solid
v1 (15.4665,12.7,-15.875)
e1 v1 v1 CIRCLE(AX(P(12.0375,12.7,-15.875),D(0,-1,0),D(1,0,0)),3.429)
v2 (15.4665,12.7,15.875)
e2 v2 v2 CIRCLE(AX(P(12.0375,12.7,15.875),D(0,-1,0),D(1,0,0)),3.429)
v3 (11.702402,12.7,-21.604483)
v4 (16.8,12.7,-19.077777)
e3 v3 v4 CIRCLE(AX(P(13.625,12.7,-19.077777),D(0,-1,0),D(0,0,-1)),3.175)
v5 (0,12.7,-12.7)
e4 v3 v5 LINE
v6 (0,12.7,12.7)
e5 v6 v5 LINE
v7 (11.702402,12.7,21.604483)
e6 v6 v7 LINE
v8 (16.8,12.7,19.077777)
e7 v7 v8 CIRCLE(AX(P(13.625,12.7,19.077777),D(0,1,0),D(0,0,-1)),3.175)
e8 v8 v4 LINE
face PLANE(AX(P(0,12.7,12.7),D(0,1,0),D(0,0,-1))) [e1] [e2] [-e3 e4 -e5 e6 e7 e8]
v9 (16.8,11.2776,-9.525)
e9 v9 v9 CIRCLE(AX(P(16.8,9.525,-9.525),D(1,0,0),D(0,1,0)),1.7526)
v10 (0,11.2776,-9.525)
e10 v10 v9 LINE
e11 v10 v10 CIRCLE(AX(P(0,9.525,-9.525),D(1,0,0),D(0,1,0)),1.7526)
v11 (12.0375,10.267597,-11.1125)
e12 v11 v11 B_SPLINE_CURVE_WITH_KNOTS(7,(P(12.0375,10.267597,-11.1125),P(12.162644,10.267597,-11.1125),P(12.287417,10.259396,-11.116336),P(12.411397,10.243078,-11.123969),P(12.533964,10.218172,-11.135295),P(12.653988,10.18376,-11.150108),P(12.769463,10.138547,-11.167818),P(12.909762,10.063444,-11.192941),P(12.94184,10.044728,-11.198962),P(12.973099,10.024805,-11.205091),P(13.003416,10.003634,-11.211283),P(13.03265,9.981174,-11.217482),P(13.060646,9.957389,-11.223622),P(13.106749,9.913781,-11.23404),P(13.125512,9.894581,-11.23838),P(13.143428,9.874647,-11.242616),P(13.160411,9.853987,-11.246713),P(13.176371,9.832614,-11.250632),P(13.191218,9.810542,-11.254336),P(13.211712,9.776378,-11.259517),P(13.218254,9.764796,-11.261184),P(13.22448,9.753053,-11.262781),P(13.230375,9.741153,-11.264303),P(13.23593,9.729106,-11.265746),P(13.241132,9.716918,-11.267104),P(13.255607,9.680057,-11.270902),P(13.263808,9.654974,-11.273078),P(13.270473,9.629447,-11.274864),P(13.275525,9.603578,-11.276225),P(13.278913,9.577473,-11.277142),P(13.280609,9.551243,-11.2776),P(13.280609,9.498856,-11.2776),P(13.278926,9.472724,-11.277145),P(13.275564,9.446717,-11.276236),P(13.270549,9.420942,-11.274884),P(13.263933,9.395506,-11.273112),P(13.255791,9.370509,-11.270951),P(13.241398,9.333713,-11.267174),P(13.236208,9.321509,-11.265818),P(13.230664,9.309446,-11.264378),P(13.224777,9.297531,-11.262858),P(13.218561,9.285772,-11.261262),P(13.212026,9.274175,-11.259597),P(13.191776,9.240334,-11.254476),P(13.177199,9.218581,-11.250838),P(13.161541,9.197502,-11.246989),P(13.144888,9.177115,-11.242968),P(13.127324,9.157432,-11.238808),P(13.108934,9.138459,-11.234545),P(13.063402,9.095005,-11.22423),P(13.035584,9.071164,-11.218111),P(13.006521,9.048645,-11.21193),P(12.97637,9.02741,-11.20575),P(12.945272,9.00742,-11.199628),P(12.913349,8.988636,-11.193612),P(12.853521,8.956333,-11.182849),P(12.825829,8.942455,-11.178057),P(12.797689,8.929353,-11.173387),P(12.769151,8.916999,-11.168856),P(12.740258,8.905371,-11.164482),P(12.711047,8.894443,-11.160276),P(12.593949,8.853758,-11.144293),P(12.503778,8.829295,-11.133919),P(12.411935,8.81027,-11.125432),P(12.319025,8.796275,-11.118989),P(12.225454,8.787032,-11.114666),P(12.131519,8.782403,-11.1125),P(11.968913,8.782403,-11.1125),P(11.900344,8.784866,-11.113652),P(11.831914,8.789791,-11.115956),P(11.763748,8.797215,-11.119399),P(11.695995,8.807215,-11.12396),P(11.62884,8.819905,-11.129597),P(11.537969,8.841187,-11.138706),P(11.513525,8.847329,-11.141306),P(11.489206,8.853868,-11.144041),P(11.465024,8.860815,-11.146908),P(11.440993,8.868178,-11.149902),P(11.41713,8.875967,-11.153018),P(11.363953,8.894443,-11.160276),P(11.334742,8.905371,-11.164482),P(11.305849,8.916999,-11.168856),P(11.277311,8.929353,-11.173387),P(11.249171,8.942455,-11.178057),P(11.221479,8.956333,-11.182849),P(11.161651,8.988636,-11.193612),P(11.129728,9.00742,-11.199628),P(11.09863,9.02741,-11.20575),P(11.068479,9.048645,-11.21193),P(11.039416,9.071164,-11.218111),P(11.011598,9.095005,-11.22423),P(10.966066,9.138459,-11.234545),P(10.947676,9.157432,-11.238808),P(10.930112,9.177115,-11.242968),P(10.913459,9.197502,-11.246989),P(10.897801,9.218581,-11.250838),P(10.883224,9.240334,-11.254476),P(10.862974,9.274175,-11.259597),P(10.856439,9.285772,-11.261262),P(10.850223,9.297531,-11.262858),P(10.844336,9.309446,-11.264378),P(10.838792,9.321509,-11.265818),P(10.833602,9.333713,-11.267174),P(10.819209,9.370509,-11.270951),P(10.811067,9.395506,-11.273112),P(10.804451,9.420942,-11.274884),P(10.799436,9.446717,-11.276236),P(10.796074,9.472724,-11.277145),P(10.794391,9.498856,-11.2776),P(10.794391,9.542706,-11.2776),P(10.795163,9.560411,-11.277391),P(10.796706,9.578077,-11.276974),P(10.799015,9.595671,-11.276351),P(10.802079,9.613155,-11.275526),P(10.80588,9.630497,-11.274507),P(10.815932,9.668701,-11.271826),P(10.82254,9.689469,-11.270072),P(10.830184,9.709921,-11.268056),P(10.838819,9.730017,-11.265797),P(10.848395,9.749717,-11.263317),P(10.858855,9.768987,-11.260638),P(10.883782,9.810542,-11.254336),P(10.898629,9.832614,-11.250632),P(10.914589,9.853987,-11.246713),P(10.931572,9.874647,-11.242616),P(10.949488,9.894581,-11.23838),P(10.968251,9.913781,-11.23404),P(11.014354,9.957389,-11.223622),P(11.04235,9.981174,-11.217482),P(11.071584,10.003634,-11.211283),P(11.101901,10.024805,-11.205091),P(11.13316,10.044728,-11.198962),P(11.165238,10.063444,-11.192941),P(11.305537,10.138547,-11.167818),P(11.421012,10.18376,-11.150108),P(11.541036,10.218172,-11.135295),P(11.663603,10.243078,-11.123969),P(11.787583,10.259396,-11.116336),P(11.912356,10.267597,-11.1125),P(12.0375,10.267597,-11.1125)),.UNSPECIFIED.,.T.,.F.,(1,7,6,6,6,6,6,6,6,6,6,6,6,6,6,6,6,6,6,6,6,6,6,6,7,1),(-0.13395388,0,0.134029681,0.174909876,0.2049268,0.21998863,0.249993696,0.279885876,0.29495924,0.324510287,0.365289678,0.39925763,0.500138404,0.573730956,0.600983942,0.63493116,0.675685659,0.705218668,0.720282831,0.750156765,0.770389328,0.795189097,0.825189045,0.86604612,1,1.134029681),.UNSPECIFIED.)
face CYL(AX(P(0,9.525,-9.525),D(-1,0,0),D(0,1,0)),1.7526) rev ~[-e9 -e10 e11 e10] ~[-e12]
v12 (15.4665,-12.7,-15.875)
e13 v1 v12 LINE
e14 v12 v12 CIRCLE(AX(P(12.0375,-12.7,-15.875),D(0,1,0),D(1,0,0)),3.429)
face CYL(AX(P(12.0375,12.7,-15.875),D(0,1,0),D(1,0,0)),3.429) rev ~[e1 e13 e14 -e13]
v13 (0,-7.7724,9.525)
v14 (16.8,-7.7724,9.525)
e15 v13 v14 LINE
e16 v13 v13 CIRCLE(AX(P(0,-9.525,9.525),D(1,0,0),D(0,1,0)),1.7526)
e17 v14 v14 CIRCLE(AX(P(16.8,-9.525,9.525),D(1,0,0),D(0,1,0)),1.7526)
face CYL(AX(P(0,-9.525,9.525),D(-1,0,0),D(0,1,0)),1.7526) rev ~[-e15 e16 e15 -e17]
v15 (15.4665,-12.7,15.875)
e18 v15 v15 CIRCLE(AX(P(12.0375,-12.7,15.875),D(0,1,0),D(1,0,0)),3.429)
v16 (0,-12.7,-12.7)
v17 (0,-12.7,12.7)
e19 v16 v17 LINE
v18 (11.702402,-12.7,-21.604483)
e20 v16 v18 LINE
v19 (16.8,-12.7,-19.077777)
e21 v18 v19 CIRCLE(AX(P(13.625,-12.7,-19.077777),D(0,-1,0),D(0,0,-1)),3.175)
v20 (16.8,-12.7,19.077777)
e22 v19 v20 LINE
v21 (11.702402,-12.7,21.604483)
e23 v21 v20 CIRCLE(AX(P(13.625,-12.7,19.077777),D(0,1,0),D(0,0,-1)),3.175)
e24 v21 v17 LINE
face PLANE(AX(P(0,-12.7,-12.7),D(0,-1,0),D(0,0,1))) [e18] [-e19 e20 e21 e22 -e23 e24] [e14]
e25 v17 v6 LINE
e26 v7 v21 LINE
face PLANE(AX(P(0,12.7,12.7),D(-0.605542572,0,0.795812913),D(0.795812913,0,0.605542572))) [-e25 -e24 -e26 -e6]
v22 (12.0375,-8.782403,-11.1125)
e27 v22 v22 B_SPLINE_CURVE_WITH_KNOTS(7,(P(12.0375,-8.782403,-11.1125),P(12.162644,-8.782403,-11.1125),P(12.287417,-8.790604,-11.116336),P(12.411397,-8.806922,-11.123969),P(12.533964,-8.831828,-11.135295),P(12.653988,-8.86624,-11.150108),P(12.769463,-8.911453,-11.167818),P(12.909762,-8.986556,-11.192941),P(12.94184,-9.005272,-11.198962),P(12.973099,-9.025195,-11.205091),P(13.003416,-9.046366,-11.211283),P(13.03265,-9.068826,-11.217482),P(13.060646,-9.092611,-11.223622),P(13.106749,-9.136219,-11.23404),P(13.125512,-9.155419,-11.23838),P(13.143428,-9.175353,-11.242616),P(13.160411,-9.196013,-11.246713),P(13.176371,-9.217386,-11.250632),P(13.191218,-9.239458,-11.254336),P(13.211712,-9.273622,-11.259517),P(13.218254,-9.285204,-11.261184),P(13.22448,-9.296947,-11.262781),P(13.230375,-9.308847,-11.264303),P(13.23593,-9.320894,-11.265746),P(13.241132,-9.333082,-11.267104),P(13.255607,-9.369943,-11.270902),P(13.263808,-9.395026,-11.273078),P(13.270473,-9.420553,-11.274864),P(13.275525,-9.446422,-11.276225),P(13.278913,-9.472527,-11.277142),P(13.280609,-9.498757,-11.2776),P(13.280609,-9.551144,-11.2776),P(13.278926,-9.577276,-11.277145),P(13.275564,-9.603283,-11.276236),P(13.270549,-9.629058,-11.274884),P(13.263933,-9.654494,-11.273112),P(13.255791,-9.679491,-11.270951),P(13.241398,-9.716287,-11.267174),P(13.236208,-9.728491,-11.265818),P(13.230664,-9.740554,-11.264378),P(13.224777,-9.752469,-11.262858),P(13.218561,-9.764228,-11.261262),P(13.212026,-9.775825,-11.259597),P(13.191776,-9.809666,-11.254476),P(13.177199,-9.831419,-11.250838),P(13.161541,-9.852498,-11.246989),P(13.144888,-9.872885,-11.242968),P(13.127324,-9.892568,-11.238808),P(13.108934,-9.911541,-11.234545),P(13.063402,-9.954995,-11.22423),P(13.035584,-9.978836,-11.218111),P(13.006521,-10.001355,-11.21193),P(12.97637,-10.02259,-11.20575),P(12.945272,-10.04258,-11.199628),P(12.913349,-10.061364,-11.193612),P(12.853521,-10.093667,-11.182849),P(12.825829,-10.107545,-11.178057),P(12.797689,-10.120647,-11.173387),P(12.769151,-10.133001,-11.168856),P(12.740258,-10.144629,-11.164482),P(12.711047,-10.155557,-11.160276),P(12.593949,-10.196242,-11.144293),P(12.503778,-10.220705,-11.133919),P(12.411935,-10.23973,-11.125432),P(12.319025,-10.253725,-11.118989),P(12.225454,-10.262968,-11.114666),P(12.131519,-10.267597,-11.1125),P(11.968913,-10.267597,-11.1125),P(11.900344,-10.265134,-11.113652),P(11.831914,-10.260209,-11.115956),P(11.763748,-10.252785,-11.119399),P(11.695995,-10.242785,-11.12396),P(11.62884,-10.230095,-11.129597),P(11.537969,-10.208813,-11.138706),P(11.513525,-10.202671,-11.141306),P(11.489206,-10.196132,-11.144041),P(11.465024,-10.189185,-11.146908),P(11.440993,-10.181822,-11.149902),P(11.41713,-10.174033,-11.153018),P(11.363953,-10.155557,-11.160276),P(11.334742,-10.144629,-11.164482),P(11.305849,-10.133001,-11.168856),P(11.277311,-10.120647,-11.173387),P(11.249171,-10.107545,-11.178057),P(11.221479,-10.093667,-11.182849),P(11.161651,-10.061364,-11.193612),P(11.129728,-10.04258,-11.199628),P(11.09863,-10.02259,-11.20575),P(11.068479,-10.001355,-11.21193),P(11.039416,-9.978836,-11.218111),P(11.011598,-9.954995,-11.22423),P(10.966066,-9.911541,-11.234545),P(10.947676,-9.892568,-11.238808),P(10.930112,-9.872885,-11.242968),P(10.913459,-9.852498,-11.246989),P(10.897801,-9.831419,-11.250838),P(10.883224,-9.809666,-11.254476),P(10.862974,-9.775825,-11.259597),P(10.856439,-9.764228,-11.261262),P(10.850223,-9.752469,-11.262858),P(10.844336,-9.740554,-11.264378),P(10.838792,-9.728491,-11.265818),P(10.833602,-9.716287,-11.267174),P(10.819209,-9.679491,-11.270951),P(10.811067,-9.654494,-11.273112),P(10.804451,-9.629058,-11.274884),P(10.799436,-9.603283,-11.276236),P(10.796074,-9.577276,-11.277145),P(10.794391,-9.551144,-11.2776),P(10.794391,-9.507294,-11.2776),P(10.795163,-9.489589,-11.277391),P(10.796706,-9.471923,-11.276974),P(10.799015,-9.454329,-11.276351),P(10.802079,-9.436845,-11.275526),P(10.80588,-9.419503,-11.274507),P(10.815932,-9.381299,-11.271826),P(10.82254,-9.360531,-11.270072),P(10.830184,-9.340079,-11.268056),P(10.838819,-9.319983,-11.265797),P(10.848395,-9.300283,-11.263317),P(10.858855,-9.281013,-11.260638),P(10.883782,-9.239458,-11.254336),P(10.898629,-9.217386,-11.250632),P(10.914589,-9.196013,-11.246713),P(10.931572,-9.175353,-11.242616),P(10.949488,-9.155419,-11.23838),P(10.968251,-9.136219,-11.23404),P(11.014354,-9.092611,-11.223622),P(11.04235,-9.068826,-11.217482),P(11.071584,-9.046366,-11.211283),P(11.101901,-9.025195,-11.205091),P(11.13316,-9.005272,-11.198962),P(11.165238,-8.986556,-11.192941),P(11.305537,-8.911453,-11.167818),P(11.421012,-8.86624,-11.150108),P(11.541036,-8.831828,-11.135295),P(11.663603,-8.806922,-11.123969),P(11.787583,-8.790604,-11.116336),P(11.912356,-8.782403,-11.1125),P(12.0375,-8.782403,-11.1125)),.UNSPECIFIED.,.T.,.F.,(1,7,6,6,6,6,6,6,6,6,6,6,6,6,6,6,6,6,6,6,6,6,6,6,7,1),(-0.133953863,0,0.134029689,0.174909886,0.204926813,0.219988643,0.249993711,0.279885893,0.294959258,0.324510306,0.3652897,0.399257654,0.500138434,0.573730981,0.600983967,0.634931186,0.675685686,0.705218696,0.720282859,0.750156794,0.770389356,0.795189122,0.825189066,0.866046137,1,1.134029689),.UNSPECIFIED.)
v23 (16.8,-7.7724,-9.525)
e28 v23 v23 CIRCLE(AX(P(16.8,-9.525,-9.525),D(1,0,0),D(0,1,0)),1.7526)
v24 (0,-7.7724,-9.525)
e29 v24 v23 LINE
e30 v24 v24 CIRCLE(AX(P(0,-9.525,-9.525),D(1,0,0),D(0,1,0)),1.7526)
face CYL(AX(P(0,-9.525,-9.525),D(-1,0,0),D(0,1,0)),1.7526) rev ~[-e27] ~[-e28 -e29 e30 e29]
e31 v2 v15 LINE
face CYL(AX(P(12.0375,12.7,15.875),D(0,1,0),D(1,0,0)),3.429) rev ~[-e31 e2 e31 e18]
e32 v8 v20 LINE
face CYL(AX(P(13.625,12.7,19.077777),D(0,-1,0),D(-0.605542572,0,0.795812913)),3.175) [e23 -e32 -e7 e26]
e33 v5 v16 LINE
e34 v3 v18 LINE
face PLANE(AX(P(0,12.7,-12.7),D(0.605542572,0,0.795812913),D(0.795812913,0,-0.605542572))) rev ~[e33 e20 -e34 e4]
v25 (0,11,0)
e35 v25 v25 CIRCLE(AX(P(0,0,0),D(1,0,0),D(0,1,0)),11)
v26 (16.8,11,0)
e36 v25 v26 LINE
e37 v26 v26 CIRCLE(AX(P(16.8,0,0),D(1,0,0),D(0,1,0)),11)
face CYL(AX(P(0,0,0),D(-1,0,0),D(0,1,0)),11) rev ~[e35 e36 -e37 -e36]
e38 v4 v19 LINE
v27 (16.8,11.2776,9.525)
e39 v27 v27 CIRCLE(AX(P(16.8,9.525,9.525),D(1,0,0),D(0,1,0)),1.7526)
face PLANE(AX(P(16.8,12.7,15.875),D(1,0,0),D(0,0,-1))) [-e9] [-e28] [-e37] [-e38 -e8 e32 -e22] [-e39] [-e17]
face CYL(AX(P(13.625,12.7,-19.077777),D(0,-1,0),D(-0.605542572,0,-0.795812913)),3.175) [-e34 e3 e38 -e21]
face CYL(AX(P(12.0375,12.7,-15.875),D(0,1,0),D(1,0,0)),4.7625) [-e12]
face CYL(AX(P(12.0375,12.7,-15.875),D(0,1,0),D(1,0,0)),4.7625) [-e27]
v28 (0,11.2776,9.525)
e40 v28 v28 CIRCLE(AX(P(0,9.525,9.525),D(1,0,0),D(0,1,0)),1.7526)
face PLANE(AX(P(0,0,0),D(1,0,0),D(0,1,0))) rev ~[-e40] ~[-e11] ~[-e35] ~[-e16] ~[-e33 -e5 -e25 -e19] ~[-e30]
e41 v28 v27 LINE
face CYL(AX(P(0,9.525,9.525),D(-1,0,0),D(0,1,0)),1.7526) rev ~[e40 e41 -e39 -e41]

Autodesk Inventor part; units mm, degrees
ref_plane "YZ Plane" through (0, 0, 0) normal (1, 0, 0) x (0, 1, 0)
ref_plane "XZ Plane" through (0, 0, 0) normal (0, 1, 0) x (-1, 0, 0)
ref_plane "XY Plane" through (0, 0, 0) normal (0, 0, 1) x (1, 0, 0)
sketch "Sketch1" plane through (0, 0, 0) normal (1, 0, 0) x (0, 1, 0)
  circle A0 centre (0, 0) radius 11
  line L0 (-12.7, 12.7) -> (12.7, 12.7)
  line L1 (12.7, 12.7) -> (12.7, -12.7)
  line L2 (12.7, -12.7) -> (-12.7, -12.7)
  line L3 (-12.7, -12.7) -> (-12.7, 12.7)
  line L4 (-12.7, 12.7) -> (12.7, -12.7) construction
  line L5 (12.7, 12.7) -> (-12.7, -12.7) construction
  line L6 (-9.525, 9.525) -> (9.525, 9.525) construction
  line L7 (9.525, 9.525) -> (9.525, -9.525) construction
  line L8 (9.525, -9.525) -> (-9.525, -9.525) construction
  line L9 (-9.525, -9.525) -> (-9.525, 9.525) construction
  line L10 (-9.525, 9.525) -> (9.525, -9.525) construction
  line L11 (9.525, 9.525) -> (-9.525, -9.525) construction
  circle A1 centre (9.525, 9.525) radius 1.7526
  circle A2 centre (-9.525, 9.525) radius 1.7526
  circle A3 centre (-9.525, -9.525) radius 1.7526
  circle A4 centre (9.525, -9.525) radius 1.7526
  dimension "d0" = 22
  dimension "d1" = 25.4
  dimension "d2" = 25.4
  dimension "d3" = 19.05
  dimension "d4" = 19.05
  dimension "d5" = 3.5052
  dimension "d8" = 360
extrude "Extrusion1" add sketch "Sketch1" along normal blind 16.8
sketch "Sketch2" plane through (0, 12.7, 12.7) normal (0, 1, 0) x (1, 0, 0)
  circle A0 centre (12.0375, -3.175) radius 4.7625
  circle A1 centre (12.0375, -3.175) radius 3.175
  line L0 (0, 0) -> (16.8, 0) projected
  line L1 (16.8, 25.4) -> (16.8, 0) projected
  line L2 (0, 12.7) -> (16.8, 12.7) construction
  line L3 (16.8, -12.7833) -> (16.8, 0)
  circle A2 centre (12.0375, 28.575) radius 4.7625
  circle A3 centre (12.0375, 28.575) radius 3.175
  line L4 (0, 25.4) -> (16.8, 25.4)
  line L5 (16.8, 38.1833) -> (16.8, 25.4)
  line L6 (0, 25.4) -> (16.8, 25.4) projected
  line L7 (0, 25.4) -> (16.8, 38.1833)
  line L8 (0, 0) -> (16.8, -12.7833)
  point P0 (16.8, -3.175)
  point P1 (16.8, 28.575)
  point P2 (15.5873, 25.4)
  point P3 (8.4877, 25.4)
  point P4 (9.1536, -6.9651)
  point P5 (8.4877, 0)
  point P6 (15.5873, 0)
  dimension "d12" = 9.525
  dimension "d13" = 6.35
extrude "Extrusion2" add sketch "Sketch2" against normal up to surface (25.4 mm away) contours A0 L0 | L3 L8 A0 | A0 L0 L3 | L8 L0 A0 | A2 L4 | L5 L4 A2 | A2 L7 L5 | A2 L4 L7 | A2 L4 picked at (16.2227, -3.5628)
thicken "Thicken1" operation cut thickness 0.254 both sides no extend neighbours no toward (0.9967573, 0, 0.0804666) faces at (15.2022, -4.2333, 16.1305)
thicken "Thicken2" operation cut thickness 0.254 both sides no extend neighbours no toward (0.9870503, 0, -0.1604113) faces at (15.1714, 4.2333, -16.3843)
fillet "Fillet4" radius 3.175 2 edges at (16.8, 0, 25.4833) (16.8, 0, -25.4833)
properties part number "Motor Sleeve" material "UHMW, Black"
